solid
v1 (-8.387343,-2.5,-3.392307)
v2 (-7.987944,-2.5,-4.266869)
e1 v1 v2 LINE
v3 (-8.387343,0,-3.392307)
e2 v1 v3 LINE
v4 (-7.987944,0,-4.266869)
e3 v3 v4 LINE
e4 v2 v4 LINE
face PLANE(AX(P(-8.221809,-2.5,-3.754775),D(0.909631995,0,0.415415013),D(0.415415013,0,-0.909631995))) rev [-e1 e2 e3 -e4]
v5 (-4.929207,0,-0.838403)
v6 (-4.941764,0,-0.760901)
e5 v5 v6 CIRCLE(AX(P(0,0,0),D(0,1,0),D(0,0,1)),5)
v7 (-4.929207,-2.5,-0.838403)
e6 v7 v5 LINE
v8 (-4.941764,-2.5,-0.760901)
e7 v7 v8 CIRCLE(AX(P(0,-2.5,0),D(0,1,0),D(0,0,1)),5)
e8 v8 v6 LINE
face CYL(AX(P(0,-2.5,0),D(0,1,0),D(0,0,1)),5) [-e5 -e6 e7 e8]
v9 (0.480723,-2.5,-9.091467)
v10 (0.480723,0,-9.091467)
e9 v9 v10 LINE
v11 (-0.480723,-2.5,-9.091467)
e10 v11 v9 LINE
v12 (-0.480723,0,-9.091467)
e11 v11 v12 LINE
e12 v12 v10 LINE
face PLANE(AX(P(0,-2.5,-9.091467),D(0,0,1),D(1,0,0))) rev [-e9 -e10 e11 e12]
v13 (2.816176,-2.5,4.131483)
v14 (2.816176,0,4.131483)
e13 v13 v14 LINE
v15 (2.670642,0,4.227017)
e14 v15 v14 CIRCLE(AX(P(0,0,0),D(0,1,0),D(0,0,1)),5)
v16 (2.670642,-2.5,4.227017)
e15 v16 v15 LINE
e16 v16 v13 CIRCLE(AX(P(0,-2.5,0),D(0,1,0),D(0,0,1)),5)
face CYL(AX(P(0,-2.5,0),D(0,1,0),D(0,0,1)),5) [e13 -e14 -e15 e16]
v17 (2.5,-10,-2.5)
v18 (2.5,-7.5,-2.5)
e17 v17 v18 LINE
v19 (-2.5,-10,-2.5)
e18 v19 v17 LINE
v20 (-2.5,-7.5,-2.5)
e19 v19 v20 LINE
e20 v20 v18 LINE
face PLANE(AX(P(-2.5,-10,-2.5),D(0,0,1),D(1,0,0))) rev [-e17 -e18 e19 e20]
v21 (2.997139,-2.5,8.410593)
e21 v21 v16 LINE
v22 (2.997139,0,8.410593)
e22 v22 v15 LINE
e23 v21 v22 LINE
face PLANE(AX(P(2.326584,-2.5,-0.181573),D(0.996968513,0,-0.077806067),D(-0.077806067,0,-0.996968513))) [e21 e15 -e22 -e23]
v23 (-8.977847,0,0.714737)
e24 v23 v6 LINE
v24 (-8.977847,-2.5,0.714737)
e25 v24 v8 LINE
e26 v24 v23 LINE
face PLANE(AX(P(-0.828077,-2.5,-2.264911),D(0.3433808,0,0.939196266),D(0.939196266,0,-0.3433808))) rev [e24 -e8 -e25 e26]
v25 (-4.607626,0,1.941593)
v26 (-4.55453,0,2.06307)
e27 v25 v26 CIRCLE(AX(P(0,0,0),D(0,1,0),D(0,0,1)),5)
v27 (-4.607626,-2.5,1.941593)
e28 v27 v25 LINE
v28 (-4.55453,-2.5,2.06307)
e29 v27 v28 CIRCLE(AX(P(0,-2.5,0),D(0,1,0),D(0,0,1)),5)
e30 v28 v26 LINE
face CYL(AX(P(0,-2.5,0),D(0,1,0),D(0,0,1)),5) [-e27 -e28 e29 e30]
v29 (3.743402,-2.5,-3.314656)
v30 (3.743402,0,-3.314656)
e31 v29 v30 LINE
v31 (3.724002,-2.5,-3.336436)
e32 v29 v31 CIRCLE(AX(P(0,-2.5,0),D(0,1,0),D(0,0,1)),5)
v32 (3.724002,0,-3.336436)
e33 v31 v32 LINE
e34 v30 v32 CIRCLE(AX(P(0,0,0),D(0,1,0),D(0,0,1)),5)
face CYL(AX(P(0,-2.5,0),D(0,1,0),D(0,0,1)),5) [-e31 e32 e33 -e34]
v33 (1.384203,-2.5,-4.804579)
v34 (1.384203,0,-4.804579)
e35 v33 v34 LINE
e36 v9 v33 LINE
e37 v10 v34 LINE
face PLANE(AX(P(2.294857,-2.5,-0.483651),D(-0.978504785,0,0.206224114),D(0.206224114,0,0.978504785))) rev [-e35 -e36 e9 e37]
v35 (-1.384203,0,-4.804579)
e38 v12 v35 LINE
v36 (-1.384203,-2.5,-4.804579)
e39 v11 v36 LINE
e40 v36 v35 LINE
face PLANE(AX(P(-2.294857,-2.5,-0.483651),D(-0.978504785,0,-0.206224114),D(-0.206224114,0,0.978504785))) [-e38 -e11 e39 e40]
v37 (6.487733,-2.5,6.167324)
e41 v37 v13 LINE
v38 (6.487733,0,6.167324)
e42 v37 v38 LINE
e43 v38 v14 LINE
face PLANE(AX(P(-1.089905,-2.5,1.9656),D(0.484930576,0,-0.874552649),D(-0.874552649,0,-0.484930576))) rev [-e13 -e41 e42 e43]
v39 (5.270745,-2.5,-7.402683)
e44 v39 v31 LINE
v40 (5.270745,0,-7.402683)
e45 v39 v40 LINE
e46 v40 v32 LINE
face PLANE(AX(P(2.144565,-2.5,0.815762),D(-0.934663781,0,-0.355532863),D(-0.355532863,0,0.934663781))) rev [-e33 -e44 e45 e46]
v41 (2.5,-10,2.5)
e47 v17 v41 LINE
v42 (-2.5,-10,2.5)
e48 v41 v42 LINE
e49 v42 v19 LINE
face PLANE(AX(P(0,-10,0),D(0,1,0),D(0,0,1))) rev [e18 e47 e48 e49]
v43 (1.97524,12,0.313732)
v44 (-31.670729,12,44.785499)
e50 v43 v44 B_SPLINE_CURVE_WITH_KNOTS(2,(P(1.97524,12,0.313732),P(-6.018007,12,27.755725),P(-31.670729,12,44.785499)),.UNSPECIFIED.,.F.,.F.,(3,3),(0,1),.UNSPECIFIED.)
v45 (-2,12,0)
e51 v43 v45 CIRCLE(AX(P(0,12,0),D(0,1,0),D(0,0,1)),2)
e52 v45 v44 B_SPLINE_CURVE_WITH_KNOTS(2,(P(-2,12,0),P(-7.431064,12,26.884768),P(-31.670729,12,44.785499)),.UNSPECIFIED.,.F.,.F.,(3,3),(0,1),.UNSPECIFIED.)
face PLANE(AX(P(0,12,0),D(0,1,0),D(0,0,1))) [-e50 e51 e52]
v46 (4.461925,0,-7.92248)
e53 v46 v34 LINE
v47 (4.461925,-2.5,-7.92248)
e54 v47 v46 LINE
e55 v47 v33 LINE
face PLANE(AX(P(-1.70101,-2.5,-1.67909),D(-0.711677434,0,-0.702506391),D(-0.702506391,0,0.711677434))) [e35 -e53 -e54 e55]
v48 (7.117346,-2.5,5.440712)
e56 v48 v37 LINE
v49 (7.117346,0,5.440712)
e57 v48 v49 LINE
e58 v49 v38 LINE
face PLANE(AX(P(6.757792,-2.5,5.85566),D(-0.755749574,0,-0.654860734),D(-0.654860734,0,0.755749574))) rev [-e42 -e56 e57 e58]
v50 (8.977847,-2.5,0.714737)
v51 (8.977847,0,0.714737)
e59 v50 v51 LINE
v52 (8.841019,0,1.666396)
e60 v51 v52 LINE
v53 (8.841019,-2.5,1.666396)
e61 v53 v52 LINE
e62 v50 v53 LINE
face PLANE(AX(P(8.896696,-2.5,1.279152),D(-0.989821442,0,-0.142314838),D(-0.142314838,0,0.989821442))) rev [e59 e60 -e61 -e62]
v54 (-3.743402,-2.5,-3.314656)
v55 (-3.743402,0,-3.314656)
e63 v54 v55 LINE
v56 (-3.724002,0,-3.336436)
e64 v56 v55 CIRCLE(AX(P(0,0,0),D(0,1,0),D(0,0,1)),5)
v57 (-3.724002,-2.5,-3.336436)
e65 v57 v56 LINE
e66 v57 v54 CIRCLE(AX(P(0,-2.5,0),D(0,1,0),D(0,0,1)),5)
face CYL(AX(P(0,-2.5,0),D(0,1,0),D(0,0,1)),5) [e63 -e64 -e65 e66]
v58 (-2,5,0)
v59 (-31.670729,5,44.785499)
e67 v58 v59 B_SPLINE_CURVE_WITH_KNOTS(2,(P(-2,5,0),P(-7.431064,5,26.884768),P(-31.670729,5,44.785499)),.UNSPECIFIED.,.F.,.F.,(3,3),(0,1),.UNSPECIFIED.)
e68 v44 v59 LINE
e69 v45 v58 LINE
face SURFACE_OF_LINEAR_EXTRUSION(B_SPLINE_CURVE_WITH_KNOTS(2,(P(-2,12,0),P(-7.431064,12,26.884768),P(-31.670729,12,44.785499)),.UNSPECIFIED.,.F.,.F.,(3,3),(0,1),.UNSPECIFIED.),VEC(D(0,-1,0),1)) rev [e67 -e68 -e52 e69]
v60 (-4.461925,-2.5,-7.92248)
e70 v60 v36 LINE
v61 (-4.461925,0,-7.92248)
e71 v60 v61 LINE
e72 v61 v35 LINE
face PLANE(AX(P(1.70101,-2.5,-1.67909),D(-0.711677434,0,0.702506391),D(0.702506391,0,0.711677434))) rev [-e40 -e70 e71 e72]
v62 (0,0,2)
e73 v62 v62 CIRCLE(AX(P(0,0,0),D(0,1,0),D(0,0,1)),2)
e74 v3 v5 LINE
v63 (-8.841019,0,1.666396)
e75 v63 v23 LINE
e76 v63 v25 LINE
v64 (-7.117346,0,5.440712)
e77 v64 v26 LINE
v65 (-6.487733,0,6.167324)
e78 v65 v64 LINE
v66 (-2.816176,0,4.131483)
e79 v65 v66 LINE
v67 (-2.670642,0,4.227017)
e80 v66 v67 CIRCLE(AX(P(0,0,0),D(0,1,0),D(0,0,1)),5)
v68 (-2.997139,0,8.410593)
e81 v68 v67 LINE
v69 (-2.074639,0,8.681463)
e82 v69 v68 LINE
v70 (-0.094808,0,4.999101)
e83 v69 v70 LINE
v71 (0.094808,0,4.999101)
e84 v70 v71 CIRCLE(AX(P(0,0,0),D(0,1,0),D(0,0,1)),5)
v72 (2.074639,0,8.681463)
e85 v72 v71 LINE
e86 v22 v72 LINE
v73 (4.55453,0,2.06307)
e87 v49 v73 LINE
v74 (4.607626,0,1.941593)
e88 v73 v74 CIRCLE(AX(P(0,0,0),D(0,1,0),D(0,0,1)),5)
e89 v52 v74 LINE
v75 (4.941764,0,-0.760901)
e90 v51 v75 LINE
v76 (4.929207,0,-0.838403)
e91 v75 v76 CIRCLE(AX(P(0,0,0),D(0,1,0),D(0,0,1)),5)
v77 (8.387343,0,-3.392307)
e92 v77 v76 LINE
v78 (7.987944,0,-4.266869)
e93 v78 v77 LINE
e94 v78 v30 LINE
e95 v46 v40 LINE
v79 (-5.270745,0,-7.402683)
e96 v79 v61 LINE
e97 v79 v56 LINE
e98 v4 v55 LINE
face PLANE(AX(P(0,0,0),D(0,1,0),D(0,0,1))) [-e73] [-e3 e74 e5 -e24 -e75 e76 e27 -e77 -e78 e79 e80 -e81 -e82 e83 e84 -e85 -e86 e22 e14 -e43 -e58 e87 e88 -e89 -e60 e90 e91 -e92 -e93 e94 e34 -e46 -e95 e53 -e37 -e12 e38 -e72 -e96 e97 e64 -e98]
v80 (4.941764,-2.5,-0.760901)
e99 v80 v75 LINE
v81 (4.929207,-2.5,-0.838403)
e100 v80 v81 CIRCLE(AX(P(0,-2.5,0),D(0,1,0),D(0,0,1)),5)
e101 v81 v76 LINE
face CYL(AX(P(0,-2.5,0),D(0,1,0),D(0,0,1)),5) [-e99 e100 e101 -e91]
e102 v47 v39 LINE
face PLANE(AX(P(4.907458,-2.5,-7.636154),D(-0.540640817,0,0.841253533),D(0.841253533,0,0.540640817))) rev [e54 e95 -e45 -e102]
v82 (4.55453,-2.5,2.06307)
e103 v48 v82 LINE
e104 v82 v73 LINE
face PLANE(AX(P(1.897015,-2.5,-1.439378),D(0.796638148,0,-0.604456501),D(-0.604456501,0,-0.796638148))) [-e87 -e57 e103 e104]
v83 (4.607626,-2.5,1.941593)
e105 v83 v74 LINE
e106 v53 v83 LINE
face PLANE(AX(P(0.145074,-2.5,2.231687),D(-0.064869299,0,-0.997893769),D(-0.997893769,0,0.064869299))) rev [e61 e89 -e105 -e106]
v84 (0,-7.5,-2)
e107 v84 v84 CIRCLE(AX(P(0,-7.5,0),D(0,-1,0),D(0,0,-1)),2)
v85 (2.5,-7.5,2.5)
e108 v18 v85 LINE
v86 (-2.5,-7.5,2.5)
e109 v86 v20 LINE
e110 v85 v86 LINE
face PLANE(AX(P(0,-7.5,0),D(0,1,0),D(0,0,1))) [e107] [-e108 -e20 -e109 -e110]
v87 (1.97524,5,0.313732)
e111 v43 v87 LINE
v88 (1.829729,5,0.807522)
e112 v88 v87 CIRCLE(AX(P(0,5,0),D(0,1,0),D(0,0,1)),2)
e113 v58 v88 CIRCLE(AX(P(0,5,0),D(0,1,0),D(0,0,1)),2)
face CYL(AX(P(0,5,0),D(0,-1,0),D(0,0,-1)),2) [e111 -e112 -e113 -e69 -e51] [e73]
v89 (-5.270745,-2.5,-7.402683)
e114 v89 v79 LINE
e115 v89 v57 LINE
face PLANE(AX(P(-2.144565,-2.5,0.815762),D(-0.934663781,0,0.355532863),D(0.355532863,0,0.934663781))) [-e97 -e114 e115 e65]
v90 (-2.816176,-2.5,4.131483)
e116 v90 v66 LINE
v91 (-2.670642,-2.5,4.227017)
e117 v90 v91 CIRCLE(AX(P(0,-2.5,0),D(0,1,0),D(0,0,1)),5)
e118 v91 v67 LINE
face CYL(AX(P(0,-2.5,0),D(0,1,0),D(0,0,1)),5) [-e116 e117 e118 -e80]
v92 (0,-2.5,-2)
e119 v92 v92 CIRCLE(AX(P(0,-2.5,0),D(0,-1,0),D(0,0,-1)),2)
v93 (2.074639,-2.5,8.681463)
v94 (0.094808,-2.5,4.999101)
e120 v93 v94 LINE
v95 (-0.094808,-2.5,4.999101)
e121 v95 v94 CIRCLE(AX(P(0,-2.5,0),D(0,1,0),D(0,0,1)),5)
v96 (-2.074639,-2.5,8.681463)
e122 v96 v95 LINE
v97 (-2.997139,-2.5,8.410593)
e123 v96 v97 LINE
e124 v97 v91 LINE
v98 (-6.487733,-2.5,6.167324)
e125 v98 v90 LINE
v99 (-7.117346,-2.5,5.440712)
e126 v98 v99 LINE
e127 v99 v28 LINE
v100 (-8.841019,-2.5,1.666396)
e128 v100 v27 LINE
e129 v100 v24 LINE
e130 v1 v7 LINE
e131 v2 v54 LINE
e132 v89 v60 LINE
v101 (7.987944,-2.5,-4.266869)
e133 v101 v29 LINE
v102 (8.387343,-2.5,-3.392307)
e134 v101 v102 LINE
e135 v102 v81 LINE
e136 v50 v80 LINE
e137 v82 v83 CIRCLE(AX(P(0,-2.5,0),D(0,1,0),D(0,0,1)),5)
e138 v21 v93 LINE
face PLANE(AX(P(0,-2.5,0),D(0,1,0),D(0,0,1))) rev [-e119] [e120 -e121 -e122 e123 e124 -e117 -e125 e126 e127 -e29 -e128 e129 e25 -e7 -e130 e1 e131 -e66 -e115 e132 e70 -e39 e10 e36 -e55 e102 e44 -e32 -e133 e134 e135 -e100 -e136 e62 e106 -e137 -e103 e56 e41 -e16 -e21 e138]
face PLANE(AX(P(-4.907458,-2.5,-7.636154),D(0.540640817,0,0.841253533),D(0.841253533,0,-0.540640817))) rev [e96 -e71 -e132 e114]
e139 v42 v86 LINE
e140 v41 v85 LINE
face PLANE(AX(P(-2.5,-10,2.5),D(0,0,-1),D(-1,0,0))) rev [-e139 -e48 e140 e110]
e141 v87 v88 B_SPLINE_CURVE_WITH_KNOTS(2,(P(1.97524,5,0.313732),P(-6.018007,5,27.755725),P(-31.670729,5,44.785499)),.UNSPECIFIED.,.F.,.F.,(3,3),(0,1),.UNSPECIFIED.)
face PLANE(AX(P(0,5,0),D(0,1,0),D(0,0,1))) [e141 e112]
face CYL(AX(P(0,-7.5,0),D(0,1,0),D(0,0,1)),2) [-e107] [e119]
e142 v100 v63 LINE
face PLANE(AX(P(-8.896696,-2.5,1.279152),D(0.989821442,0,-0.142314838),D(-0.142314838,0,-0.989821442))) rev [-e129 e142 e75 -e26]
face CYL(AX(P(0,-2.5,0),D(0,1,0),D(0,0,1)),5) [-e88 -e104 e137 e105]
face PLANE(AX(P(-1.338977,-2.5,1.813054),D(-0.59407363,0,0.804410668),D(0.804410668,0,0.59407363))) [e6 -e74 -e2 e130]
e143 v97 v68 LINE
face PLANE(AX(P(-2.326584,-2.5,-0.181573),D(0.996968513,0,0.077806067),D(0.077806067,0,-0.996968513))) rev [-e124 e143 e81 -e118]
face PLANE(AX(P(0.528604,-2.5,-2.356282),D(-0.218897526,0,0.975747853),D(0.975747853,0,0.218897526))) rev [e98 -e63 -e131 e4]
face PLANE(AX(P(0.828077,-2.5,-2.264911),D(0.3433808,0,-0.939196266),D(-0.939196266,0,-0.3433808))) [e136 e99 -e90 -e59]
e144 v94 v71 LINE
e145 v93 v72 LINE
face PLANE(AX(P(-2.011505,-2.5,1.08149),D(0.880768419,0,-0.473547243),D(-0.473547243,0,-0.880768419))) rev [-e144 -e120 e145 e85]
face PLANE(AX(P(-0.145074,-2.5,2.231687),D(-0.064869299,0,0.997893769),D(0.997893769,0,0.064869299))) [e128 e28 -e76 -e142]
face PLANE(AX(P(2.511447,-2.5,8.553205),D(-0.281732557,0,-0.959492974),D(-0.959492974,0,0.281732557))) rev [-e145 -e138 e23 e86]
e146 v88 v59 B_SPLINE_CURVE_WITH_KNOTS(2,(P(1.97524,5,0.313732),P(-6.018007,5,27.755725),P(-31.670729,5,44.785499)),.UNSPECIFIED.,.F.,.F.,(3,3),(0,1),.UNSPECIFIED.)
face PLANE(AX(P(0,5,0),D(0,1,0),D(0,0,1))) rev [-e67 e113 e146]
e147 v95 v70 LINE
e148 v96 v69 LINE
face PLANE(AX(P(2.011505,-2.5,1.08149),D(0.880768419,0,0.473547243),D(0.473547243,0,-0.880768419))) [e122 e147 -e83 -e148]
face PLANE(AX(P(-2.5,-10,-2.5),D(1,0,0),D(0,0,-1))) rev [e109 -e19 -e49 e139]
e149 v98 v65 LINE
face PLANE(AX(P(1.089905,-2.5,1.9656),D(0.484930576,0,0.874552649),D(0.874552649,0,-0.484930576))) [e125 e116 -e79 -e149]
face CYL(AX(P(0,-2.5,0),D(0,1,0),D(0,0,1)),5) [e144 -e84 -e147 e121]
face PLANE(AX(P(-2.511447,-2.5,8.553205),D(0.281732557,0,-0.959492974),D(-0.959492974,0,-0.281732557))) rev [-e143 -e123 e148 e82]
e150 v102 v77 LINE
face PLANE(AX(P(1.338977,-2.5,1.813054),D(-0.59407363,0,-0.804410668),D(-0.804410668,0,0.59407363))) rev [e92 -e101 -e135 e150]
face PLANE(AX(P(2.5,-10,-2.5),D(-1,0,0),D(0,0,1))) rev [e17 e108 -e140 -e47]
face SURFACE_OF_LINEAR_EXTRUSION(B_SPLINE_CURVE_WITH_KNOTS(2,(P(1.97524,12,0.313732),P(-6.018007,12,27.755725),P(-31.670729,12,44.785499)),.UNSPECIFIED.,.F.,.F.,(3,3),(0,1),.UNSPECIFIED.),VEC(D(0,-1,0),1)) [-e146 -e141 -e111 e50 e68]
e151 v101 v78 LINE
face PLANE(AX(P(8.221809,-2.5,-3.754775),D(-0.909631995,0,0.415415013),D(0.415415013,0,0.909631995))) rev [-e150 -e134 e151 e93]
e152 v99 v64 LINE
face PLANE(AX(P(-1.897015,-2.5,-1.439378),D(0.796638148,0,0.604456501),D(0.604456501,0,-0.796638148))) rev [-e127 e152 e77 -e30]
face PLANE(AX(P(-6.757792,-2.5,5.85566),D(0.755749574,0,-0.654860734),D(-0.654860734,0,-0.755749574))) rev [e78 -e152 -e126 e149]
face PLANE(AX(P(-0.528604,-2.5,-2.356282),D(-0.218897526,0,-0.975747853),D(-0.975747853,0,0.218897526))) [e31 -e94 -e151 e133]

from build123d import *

# Parameters (mm, degrees)
ESQUISSE1_R             = 2
BOSS_EXTRU_1_DEPTH      = 5
ESQUISSE2_W             = 10
ESQUISSE2_H             = 10
BOSS_EXTRU_2_DEPTH      = 2.5
BOSS_EXTRU_3_DEPTH      = 7
BOSS_EXTRU_4_START      = 5
ESQUISSE5_R             = 2
BOSS_EXTRU_4_DEPTH      = 5
ESQUISSE6_W             = 5
ESQUISSE6_H             = 5
BOSS_EXTRU_5_DEPTH      = 2.5
ESQUISSE7_R             = 7.071067812
ESQUISSE7_R_2           = 5
ENL_V_MAT_EXTRU_1_DEPTH = 2.5
BOSS_EXTRU_6_DEPTH      = 2.5


# Read off the part's stored shape, not the designer's step: Boss.-Extru.3
with BuildPart() as part:
    # Esquisse1 → Boss.-Extru.1 (new body)
    with BuildSketch(Plane(origin=(0, 0, 0), x_dir=(1, 0, 0), z_dir=(0, 1, 0))):
        with Locations(Location((0, 0, 0), (0, 0, 270))):
            Circle(ESQUISSE1_R)
    extrude(amount=BOSS_EXTRU_1_DEPTH)

    # Esquisse2 → Boss.-Extru.2 (add)
    with BuildSketch(Plane.XZ):
        Rectangle(ESQUISSE2_W, ESQUISSE2_H)
    extrude(amount=BOSS_EXTRU_2_DEPTH)

    # Boss.-Extru.3 outline → Boss.-Extru.3 (add)
    with BuildSketch(Plane(origin=(0, 5, 0), x_dir=(1, 0, 0), z_dir=(0, 1, 0))):
        with BuildLine():
            ThreePointArc((1.9752398, -0.313731942), (0.157353741, 1.993800341), (-2, 0))
            add(Edge.make_bspline(
                [(-2, 0), (-7.431064096, -26.884767596), (-31.670728762, -44.785499484)],
                knots=[0, 0, 0, 1, 1, 1], degree=2))
            add(Edge.make_bspline(
                [(-31.670728762, -44.785499484), (-6.018007313, -27.755724693), (1.9752398, -0.313731942)],
                knots=[0.009012394, 0.009012394, 0.009012394, 1.009012394, 1.009012394, 1.009012394], degree=2))
        make_face()
    extrude(amount=BOSS_EXTRU_3_DEPTH)

    # Esquisse5 → Boss.-Extru.4 (add)
    with BuildSketch(Plane.XZ.offset(2.5).offset(BOSS_EXTRU_4_START)):
        with Locations(Location((0, 0, 0), (0, 0, 180))):
            Circle(ESQUISSE5_R)
    extrude(amount=-BOSS_EXTRU_4_DEPTH)

    # Esquisse6 → Boss.-Extru.5 (add)
    with BuildSketch(Plane.XZ.offset(7.5)):
        Rectangle(ESQUISSE6_W, ESQUISSE6_H)
    extrude(amount=BOSS_EXTRU_5_DEPTH)

    # Esquisse7 → Enlèv. mat.-Extru.1 (cut)
    with BuildSketch(Plane(origin=(0, 0, 0), x_dir=(1, 0, 0), z_dir=(0, 1, 0))):
        Circle(ESQUISSE7_R)
        with Locations(Location((0, 0, 0), (0, 0, 270))):
            Circle(ESQUISSE7_R_2, mode=Mode.SUBTRACT)
    extrude(amount=-ENL_V_MAT_EXTRU_1_DEPTH, mode=Mode.SUBTRACT)

    # Esquisse8 → Boss.-Extru.6 (add)
    with BuildSketch(Plane(origin=(0, 0, 0), x_dir=(1, 0, 0), z_dir=(0, 1, 0))):
        with BuildLine():
            Line((0.480722973, 9.091466817), (-0.480722973, 9.091466817))
            Line((-0.480722973, 9.091466817), (-1.384203057, 4.804579263))
            ThreePointArc((-1.384203057, 4.804579263), (0, 5), (1.384203057, 4.804579263))
            Line((1.384203057, 4.804579263), (0.480722973, 9.091466817))
        make_face()
        with BuildLine():
            ThreePointArc((-3.724002251, 3.336436308), (-2.657499069, 4.235292044), (-1.384203057, 4.804579263))
            Line((-1.384203057, 4.804579263), (-4.46192526, 7.922480352))
            Line((-4.46192526, 7.922480352), (-5.270745059, 7.40268343))
            Line((-5.270745059, 7.40268343), (-3.724002251, 3.336436308))
        make_face()
        with BuildLine():
            ThreePointArc((-4.929206832, 0.838403251), (-4.509599896, 2.159515866), (-3.743401614, 3.314655994))
            Line((-3.743401614, 3.314655994), (-7.98794375, 4.266868977))
            Line((-7.98794375, 4.266868977), (-8.38734283, 3.392306983))
            Line((-8.38734283, 3.392306983), (-4.929206832, 0.838403251))
        make_face()
        with BuildLine():
            ThreePointArc((-4.607625844, -1.941593182), (-4.962215179, -0.613531185), (-4.941763812, 0.760901064))
            Line((-4.941763812, 0.760901064), (-8.977846539, -0.714736526))
            Line((-8.977846539, -0.714736526), (-8.841018515, -1.666396338))
            Line((-8.841018515, -1.666396338), (-4.607625844, -1.941593182))
        make_face()
        with BuildLine():
            ThreePointArc((-2.816176348, -4.131482879), (-3.827716111, -3.216922344), (-4.554529885, -2.063069927))
            Line((-4.554529885, -2.063069927), (-7.117346486, -5.440711607))
            Line((-7.117346486, -5.440711607), (-6.487733289, -6.167323972))
            Line((-6.487733289, -6.167323972), (-2.816176348, -4.131482879))
        make_face()
        with BuildLine():
            Line((2.997139213, -8.410592571), (2.670641872, -4.227016914))
            ThreePointArc((2.670641872, -4.227016914), (1.435603167, -4.789472158), (0.094807796, -4.999101067))
            Line((0.094807796, -4.999101067), (2.074638584, -8.681463196))
            Line((2.074638584, -8.681463196), (2.997139213, -8.410592571))
        make_face()
        with BuildLine():
            Line((7.117346486, -5.440711607), (4.554529885, -2.063069927))
            ThreePointArc((4.554529885, -2.063069927), (3.827716111, -3.216922344), (2.816176348, -4.131482879))
            Line((2.816176348, -4.131482879), (6.487733289, -6.167323972))
            Line((6.487733289, -6.167323972), (7.117346486, -5.440711607))
        make_face()
        with BuildLine():
            Line((8.977846539, -0.714736526), (4.941763812, 0.760901064))
            ThreePointArc((4.941763812, 0.760901064), (4.985419694, 0.381563193), (5, 0))
            ThreePointArc((5, 0), (4.900924873, -0.990421825), (4.607625844, -1.941593182))
            Line((4.607625844, -1.941593182), (8.841018515, -1.666396338))
            Line((8.841018515, -1.666396338), (8.977846539, -0.714736526))
        make_face()
        with BuildLine():
            Line((7.98794375, 4.266868977), (3.743401614, 3.314655994))
            ThreePointArc((3.743401614, 3.314655994), (4.509599896, 2.159515866), (4.929206832, 0.838403251))
            Line((4.929206832, 0.838403251), (8.38734283, 3.392306983))
            Line((8.38734283, 3.392306983), (7.98794375, 4.266868977))
        make_face()
        with BuildLine():
            Line((4.46192526, 7.922480352), (1.384203057, 4.804579263))
            ThreePointArc((1.384203057, 4.804579263), (2.657499069, 4.235292044), (3.724002251, 3.336436308))
            Line((3.724002251, 3.336436308), (5.270745059, 7.40268343))
            Line((5.270745059, 7.40268343), (4.46192526, 7.922480352))
        make_face()
        with BuildLine():
            ThreePointArc((-0.094807796, -4.999101067), (-1.435603167, -4.789472158), (-2.670641872, -4.227016914))
            Line((-2.670641872, -4.227016914), (-2.997139213, -8.410592571))
            Line((-2.997139213, -8.410592571), (-2.074638584, -8.681463196))
            Line((-2.074638584, -8.681463196), (-0.094807796, -4.999101067))
        make_face()
    extrude(amount=-BOSS_EXTRU_6_DEPTH)


solid = part.part
